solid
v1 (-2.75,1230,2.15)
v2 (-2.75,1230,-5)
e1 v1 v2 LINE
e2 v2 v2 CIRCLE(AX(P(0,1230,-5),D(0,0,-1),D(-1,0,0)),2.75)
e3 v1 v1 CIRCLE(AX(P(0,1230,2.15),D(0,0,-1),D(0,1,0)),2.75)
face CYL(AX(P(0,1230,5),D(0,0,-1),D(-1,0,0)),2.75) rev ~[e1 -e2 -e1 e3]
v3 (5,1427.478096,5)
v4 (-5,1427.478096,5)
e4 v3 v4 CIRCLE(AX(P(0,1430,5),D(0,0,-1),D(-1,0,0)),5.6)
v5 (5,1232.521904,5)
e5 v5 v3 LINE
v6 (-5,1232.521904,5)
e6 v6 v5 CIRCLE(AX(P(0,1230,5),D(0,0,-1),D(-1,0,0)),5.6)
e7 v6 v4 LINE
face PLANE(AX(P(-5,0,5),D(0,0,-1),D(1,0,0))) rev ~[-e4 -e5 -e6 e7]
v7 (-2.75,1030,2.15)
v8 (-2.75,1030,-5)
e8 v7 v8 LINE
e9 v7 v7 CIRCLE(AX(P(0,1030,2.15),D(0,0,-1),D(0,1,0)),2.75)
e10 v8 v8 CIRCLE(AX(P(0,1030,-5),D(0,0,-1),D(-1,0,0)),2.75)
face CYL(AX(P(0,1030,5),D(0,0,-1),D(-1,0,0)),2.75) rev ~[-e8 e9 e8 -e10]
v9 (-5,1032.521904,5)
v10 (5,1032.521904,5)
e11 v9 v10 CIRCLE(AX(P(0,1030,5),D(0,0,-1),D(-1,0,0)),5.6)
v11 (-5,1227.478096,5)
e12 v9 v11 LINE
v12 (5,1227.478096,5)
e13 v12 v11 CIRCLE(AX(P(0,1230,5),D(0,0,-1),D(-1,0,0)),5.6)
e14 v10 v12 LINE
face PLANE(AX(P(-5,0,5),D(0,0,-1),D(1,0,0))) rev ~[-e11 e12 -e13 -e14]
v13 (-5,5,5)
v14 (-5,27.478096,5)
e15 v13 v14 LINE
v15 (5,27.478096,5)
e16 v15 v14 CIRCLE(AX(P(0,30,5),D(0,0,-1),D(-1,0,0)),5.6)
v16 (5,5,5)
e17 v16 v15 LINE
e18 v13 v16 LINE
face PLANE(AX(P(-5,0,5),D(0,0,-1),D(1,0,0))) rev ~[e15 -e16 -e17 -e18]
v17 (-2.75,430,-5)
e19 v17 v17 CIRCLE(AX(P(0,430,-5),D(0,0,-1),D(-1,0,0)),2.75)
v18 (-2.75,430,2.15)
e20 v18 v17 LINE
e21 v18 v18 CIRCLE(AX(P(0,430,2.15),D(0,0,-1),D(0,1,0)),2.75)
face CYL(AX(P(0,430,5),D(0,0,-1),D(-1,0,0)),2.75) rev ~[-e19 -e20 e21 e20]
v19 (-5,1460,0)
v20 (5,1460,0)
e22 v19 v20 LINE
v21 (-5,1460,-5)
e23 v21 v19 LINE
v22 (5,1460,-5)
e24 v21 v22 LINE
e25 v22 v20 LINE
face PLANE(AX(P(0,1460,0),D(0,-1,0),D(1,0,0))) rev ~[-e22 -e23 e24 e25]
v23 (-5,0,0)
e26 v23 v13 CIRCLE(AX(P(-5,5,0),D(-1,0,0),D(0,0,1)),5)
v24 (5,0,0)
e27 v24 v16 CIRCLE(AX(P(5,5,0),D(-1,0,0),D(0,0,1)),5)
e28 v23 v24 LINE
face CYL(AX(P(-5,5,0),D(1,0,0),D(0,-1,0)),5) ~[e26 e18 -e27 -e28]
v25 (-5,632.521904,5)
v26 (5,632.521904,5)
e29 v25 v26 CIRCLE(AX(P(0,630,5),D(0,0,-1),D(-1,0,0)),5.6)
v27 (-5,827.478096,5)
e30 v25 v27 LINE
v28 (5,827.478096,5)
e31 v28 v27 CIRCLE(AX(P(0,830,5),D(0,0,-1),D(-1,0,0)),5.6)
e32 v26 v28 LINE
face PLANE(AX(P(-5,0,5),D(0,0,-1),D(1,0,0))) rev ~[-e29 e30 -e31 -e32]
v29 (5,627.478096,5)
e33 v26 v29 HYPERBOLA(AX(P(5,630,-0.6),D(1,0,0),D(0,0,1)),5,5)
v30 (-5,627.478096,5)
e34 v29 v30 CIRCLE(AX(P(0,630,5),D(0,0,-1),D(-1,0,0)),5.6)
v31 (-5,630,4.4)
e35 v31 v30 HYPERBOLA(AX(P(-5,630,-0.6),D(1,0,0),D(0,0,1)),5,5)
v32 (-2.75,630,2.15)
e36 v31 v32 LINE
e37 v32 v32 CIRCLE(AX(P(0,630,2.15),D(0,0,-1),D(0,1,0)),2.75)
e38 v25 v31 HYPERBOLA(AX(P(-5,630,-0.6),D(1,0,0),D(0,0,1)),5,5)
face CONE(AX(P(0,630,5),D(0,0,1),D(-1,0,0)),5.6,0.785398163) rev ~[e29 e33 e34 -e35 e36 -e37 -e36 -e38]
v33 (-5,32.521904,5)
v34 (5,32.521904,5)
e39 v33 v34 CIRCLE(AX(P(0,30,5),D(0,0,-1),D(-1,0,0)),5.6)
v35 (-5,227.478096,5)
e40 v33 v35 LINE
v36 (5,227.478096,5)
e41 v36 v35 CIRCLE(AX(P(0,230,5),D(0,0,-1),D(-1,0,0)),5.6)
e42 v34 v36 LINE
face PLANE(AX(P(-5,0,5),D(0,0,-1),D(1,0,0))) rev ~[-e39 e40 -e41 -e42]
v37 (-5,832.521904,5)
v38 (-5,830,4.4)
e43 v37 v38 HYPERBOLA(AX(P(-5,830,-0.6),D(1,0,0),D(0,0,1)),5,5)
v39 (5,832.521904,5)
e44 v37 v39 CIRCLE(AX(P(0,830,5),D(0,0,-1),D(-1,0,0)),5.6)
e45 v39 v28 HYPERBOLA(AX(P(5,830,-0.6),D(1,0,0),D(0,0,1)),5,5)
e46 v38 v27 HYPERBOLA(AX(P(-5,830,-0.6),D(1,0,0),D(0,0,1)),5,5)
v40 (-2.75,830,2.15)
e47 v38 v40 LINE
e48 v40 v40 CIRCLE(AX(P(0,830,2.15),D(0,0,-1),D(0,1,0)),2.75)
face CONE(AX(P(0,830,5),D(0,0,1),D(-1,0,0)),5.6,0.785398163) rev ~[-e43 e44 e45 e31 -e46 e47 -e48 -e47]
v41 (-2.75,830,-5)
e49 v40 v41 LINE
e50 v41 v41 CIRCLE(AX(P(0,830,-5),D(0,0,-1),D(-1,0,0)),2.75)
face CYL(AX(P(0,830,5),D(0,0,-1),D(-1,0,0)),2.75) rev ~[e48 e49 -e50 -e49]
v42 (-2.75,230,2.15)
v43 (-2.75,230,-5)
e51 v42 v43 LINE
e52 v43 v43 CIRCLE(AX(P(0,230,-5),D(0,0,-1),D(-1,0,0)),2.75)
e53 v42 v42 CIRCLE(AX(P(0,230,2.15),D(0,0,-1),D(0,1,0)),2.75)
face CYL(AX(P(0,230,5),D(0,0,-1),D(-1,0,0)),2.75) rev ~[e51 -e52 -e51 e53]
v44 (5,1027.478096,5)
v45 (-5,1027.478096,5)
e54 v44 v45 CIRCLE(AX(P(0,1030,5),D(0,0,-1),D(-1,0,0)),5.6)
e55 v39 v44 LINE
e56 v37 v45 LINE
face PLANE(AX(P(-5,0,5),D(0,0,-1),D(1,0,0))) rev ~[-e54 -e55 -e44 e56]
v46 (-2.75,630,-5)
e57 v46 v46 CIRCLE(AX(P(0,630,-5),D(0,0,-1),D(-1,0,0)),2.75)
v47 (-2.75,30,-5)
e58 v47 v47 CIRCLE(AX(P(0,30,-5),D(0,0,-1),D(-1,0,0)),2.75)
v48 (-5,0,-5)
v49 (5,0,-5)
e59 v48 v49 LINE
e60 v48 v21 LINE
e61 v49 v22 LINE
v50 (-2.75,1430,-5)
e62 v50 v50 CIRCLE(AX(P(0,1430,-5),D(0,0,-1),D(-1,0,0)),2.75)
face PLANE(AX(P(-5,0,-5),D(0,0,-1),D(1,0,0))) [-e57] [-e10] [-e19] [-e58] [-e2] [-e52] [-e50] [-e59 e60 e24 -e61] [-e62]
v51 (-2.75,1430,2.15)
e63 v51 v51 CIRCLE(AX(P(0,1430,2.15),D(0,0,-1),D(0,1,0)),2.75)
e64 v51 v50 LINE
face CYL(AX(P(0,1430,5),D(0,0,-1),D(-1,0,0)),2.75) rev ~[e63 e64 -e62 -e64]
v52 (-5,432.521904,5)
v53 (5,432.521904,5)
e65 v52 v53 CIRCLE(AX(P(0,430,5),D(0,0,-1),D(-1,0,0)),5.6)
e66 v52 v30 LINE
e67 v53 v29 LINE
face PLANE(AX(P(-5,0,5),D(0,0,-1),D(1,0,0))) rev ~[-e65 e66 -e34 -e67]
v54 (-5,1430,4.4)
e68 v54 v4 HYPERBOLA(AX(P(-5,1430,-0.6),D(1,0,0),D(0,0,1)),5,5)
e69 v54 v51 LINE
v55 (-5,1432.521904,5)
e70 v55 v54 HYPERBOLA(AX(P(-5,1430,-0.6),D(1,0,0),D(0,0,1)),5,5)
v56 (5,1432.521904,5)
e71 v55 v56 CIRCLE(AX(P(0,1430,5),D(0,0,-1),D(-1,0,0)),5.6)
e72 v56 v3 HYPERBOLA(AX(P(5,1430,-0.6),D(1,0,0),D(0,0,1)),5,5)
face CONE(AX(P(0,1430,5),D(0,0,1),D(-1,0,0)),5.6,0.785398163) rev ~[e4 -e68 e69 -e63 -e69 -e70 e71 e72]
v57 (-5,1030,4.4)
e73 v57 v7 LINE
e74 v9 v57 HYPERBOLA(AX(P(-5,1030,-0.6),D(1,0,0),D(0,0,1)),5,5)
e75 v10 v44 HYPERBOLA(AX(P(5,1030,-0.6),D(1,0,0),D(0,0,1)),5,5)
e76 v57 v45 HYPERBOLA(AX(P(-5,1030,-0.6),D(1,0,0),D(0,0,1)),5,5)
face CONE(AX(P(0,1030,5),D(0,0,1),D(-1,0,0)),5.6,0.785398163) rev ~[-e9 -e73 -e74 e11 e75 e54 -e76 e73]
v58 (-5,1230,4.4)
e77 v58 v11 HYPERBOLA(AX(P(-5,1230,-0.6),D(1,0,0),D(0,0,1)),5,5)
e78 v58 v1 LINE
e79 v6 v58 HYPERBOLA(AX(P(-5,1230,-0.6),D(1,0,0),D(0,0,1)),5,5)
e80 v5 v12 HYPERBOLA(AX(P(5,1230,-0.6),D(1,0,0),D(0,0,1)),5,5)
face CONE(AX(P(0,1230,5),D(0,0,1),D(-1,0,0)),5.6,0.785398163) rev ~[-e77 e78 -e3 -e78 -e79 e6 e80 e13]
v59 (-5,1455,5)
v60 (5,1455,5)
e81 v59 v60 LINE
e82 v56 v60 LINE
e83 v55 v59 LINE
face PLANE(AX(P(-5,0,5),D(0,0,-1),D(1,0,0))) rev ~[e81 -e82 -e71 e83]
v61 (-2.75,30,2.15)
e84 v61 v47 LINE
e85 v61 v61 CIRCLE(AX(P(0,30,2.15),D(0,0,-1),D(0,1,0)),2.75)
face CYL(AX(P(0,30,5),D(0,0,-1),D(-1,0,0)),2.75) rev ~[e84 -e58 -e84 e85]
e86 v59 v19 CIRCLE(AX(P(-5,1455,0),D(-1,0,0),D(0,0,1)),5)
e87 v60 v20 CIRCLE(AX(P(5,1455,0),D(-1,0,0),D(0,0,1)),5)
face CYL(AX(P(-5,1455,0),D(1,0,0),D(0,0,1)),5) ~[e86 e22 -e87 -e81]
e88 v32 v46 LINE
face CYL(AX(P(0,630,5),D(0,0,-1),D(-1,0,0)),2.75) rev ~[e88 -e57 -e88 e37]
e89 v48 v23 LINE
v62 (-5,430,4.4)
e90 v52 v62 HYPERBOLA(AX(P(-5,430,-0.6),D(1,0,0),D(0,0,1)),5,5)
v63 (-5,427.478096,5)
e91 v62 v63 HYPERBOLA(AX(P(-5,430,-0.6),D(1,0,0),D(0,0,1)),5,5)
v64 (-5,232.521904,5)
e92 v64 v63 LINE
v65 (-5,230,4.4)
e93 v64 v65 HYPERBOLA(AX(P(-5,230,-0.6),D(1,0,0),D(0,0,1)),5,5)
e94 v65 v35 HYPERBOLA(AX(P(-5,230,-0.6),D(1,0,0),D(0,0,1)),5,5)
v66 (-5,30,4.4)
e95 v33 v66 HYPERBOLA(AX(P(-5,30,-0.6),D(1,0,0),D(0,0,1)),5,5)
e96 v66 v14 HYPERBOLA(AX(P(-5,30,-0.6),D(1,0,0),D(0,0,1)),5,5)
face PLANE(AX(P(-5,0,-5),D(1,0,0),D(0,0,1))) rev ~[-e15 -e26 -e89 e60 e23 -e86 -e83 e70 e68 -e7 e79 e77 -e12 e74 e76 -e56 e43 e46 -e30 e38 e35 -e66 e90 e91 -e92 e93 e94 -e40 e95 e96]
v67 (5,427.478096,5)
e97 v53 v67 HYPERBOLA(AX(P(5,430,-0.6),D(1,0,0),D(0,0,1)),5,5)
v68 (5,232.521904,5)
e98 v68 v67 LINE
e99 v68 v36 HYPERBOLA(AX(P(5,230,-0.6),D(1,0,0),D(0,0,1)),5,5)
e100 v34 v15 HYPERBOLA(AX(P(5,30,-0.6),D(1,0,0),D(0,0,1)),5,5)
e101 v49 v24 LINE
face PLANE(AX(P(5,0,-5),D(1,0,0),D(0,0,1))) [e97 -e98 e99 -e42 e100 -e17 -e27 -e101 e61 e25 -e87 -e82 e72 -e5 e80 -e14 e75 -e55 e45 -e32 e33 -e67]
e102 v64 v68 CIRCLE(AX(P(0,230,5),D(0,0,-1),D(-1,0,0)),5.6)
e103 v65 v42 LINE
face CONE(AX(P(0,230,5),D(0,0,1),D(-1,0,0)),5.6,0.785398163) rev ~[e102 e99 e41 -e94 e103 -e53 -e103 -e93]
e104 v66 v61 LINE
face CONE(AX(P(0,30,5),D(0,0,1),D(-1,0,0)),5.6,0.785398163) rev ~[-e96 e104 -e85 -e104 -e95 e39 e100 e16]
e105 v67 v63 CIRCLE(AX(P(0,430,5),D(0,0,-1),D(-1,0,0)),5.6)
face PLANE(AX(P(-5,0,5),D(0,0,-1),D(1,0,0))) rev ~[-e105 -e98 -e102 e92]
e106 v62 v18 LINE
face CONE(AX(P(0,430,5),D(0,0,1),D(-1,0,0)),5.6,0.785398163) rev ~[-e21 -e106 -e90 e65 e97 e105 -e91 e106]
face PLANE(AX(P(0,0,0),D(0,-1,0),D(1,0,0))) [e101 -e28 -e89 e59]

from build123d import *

# Parameters (mm, degrees)
F0_W           = 10
F0_H           = 10
F1_DEPTH       = 1460
F3_D           = 5.5
F3_CSINK_D     = 11.2
F3_CSINK_ANGLE = 90
F4_R           = 5
F5_R           = 5


# Not quite as in the source:
# - a feature names something its author has since deleted; it is built from what else it names


with BuildPart() as f1:
    # F0 (on Front) → F1 (new body)
    with BuildSketch(Plane.XZ):
        Rectangle(F0_W, F0_H)
    extrude(amount=-F1_DEPTH)

    # F3 (through all)
    with Locations(Plane.XY.offset(5)):
        with Locations((0, 30), (0, 230), (0, 430), (0, 630), (0, 830), (0, 1030), (0, 1230), (0, 1430)):
            CounterSinkHole(F3_D / 2, F3_CSINK_D / 2, counter_sink_angle=F3_CSINK_ANGLE)

    # F4
    f4_edges = [f1.edges().sort_by_distance(p)[0] for p in [
        (0, 1460, 5),
    ]]
    fillet(f4_edges, radius=F4_R)

    # F5
    f5_edges = [f1.edges().sort_by_distance(p)[0] for p in [
        (0, 0, 5),
    ]]
    fillet(f5_edges, radius=F5_R)


solid = f1.part
